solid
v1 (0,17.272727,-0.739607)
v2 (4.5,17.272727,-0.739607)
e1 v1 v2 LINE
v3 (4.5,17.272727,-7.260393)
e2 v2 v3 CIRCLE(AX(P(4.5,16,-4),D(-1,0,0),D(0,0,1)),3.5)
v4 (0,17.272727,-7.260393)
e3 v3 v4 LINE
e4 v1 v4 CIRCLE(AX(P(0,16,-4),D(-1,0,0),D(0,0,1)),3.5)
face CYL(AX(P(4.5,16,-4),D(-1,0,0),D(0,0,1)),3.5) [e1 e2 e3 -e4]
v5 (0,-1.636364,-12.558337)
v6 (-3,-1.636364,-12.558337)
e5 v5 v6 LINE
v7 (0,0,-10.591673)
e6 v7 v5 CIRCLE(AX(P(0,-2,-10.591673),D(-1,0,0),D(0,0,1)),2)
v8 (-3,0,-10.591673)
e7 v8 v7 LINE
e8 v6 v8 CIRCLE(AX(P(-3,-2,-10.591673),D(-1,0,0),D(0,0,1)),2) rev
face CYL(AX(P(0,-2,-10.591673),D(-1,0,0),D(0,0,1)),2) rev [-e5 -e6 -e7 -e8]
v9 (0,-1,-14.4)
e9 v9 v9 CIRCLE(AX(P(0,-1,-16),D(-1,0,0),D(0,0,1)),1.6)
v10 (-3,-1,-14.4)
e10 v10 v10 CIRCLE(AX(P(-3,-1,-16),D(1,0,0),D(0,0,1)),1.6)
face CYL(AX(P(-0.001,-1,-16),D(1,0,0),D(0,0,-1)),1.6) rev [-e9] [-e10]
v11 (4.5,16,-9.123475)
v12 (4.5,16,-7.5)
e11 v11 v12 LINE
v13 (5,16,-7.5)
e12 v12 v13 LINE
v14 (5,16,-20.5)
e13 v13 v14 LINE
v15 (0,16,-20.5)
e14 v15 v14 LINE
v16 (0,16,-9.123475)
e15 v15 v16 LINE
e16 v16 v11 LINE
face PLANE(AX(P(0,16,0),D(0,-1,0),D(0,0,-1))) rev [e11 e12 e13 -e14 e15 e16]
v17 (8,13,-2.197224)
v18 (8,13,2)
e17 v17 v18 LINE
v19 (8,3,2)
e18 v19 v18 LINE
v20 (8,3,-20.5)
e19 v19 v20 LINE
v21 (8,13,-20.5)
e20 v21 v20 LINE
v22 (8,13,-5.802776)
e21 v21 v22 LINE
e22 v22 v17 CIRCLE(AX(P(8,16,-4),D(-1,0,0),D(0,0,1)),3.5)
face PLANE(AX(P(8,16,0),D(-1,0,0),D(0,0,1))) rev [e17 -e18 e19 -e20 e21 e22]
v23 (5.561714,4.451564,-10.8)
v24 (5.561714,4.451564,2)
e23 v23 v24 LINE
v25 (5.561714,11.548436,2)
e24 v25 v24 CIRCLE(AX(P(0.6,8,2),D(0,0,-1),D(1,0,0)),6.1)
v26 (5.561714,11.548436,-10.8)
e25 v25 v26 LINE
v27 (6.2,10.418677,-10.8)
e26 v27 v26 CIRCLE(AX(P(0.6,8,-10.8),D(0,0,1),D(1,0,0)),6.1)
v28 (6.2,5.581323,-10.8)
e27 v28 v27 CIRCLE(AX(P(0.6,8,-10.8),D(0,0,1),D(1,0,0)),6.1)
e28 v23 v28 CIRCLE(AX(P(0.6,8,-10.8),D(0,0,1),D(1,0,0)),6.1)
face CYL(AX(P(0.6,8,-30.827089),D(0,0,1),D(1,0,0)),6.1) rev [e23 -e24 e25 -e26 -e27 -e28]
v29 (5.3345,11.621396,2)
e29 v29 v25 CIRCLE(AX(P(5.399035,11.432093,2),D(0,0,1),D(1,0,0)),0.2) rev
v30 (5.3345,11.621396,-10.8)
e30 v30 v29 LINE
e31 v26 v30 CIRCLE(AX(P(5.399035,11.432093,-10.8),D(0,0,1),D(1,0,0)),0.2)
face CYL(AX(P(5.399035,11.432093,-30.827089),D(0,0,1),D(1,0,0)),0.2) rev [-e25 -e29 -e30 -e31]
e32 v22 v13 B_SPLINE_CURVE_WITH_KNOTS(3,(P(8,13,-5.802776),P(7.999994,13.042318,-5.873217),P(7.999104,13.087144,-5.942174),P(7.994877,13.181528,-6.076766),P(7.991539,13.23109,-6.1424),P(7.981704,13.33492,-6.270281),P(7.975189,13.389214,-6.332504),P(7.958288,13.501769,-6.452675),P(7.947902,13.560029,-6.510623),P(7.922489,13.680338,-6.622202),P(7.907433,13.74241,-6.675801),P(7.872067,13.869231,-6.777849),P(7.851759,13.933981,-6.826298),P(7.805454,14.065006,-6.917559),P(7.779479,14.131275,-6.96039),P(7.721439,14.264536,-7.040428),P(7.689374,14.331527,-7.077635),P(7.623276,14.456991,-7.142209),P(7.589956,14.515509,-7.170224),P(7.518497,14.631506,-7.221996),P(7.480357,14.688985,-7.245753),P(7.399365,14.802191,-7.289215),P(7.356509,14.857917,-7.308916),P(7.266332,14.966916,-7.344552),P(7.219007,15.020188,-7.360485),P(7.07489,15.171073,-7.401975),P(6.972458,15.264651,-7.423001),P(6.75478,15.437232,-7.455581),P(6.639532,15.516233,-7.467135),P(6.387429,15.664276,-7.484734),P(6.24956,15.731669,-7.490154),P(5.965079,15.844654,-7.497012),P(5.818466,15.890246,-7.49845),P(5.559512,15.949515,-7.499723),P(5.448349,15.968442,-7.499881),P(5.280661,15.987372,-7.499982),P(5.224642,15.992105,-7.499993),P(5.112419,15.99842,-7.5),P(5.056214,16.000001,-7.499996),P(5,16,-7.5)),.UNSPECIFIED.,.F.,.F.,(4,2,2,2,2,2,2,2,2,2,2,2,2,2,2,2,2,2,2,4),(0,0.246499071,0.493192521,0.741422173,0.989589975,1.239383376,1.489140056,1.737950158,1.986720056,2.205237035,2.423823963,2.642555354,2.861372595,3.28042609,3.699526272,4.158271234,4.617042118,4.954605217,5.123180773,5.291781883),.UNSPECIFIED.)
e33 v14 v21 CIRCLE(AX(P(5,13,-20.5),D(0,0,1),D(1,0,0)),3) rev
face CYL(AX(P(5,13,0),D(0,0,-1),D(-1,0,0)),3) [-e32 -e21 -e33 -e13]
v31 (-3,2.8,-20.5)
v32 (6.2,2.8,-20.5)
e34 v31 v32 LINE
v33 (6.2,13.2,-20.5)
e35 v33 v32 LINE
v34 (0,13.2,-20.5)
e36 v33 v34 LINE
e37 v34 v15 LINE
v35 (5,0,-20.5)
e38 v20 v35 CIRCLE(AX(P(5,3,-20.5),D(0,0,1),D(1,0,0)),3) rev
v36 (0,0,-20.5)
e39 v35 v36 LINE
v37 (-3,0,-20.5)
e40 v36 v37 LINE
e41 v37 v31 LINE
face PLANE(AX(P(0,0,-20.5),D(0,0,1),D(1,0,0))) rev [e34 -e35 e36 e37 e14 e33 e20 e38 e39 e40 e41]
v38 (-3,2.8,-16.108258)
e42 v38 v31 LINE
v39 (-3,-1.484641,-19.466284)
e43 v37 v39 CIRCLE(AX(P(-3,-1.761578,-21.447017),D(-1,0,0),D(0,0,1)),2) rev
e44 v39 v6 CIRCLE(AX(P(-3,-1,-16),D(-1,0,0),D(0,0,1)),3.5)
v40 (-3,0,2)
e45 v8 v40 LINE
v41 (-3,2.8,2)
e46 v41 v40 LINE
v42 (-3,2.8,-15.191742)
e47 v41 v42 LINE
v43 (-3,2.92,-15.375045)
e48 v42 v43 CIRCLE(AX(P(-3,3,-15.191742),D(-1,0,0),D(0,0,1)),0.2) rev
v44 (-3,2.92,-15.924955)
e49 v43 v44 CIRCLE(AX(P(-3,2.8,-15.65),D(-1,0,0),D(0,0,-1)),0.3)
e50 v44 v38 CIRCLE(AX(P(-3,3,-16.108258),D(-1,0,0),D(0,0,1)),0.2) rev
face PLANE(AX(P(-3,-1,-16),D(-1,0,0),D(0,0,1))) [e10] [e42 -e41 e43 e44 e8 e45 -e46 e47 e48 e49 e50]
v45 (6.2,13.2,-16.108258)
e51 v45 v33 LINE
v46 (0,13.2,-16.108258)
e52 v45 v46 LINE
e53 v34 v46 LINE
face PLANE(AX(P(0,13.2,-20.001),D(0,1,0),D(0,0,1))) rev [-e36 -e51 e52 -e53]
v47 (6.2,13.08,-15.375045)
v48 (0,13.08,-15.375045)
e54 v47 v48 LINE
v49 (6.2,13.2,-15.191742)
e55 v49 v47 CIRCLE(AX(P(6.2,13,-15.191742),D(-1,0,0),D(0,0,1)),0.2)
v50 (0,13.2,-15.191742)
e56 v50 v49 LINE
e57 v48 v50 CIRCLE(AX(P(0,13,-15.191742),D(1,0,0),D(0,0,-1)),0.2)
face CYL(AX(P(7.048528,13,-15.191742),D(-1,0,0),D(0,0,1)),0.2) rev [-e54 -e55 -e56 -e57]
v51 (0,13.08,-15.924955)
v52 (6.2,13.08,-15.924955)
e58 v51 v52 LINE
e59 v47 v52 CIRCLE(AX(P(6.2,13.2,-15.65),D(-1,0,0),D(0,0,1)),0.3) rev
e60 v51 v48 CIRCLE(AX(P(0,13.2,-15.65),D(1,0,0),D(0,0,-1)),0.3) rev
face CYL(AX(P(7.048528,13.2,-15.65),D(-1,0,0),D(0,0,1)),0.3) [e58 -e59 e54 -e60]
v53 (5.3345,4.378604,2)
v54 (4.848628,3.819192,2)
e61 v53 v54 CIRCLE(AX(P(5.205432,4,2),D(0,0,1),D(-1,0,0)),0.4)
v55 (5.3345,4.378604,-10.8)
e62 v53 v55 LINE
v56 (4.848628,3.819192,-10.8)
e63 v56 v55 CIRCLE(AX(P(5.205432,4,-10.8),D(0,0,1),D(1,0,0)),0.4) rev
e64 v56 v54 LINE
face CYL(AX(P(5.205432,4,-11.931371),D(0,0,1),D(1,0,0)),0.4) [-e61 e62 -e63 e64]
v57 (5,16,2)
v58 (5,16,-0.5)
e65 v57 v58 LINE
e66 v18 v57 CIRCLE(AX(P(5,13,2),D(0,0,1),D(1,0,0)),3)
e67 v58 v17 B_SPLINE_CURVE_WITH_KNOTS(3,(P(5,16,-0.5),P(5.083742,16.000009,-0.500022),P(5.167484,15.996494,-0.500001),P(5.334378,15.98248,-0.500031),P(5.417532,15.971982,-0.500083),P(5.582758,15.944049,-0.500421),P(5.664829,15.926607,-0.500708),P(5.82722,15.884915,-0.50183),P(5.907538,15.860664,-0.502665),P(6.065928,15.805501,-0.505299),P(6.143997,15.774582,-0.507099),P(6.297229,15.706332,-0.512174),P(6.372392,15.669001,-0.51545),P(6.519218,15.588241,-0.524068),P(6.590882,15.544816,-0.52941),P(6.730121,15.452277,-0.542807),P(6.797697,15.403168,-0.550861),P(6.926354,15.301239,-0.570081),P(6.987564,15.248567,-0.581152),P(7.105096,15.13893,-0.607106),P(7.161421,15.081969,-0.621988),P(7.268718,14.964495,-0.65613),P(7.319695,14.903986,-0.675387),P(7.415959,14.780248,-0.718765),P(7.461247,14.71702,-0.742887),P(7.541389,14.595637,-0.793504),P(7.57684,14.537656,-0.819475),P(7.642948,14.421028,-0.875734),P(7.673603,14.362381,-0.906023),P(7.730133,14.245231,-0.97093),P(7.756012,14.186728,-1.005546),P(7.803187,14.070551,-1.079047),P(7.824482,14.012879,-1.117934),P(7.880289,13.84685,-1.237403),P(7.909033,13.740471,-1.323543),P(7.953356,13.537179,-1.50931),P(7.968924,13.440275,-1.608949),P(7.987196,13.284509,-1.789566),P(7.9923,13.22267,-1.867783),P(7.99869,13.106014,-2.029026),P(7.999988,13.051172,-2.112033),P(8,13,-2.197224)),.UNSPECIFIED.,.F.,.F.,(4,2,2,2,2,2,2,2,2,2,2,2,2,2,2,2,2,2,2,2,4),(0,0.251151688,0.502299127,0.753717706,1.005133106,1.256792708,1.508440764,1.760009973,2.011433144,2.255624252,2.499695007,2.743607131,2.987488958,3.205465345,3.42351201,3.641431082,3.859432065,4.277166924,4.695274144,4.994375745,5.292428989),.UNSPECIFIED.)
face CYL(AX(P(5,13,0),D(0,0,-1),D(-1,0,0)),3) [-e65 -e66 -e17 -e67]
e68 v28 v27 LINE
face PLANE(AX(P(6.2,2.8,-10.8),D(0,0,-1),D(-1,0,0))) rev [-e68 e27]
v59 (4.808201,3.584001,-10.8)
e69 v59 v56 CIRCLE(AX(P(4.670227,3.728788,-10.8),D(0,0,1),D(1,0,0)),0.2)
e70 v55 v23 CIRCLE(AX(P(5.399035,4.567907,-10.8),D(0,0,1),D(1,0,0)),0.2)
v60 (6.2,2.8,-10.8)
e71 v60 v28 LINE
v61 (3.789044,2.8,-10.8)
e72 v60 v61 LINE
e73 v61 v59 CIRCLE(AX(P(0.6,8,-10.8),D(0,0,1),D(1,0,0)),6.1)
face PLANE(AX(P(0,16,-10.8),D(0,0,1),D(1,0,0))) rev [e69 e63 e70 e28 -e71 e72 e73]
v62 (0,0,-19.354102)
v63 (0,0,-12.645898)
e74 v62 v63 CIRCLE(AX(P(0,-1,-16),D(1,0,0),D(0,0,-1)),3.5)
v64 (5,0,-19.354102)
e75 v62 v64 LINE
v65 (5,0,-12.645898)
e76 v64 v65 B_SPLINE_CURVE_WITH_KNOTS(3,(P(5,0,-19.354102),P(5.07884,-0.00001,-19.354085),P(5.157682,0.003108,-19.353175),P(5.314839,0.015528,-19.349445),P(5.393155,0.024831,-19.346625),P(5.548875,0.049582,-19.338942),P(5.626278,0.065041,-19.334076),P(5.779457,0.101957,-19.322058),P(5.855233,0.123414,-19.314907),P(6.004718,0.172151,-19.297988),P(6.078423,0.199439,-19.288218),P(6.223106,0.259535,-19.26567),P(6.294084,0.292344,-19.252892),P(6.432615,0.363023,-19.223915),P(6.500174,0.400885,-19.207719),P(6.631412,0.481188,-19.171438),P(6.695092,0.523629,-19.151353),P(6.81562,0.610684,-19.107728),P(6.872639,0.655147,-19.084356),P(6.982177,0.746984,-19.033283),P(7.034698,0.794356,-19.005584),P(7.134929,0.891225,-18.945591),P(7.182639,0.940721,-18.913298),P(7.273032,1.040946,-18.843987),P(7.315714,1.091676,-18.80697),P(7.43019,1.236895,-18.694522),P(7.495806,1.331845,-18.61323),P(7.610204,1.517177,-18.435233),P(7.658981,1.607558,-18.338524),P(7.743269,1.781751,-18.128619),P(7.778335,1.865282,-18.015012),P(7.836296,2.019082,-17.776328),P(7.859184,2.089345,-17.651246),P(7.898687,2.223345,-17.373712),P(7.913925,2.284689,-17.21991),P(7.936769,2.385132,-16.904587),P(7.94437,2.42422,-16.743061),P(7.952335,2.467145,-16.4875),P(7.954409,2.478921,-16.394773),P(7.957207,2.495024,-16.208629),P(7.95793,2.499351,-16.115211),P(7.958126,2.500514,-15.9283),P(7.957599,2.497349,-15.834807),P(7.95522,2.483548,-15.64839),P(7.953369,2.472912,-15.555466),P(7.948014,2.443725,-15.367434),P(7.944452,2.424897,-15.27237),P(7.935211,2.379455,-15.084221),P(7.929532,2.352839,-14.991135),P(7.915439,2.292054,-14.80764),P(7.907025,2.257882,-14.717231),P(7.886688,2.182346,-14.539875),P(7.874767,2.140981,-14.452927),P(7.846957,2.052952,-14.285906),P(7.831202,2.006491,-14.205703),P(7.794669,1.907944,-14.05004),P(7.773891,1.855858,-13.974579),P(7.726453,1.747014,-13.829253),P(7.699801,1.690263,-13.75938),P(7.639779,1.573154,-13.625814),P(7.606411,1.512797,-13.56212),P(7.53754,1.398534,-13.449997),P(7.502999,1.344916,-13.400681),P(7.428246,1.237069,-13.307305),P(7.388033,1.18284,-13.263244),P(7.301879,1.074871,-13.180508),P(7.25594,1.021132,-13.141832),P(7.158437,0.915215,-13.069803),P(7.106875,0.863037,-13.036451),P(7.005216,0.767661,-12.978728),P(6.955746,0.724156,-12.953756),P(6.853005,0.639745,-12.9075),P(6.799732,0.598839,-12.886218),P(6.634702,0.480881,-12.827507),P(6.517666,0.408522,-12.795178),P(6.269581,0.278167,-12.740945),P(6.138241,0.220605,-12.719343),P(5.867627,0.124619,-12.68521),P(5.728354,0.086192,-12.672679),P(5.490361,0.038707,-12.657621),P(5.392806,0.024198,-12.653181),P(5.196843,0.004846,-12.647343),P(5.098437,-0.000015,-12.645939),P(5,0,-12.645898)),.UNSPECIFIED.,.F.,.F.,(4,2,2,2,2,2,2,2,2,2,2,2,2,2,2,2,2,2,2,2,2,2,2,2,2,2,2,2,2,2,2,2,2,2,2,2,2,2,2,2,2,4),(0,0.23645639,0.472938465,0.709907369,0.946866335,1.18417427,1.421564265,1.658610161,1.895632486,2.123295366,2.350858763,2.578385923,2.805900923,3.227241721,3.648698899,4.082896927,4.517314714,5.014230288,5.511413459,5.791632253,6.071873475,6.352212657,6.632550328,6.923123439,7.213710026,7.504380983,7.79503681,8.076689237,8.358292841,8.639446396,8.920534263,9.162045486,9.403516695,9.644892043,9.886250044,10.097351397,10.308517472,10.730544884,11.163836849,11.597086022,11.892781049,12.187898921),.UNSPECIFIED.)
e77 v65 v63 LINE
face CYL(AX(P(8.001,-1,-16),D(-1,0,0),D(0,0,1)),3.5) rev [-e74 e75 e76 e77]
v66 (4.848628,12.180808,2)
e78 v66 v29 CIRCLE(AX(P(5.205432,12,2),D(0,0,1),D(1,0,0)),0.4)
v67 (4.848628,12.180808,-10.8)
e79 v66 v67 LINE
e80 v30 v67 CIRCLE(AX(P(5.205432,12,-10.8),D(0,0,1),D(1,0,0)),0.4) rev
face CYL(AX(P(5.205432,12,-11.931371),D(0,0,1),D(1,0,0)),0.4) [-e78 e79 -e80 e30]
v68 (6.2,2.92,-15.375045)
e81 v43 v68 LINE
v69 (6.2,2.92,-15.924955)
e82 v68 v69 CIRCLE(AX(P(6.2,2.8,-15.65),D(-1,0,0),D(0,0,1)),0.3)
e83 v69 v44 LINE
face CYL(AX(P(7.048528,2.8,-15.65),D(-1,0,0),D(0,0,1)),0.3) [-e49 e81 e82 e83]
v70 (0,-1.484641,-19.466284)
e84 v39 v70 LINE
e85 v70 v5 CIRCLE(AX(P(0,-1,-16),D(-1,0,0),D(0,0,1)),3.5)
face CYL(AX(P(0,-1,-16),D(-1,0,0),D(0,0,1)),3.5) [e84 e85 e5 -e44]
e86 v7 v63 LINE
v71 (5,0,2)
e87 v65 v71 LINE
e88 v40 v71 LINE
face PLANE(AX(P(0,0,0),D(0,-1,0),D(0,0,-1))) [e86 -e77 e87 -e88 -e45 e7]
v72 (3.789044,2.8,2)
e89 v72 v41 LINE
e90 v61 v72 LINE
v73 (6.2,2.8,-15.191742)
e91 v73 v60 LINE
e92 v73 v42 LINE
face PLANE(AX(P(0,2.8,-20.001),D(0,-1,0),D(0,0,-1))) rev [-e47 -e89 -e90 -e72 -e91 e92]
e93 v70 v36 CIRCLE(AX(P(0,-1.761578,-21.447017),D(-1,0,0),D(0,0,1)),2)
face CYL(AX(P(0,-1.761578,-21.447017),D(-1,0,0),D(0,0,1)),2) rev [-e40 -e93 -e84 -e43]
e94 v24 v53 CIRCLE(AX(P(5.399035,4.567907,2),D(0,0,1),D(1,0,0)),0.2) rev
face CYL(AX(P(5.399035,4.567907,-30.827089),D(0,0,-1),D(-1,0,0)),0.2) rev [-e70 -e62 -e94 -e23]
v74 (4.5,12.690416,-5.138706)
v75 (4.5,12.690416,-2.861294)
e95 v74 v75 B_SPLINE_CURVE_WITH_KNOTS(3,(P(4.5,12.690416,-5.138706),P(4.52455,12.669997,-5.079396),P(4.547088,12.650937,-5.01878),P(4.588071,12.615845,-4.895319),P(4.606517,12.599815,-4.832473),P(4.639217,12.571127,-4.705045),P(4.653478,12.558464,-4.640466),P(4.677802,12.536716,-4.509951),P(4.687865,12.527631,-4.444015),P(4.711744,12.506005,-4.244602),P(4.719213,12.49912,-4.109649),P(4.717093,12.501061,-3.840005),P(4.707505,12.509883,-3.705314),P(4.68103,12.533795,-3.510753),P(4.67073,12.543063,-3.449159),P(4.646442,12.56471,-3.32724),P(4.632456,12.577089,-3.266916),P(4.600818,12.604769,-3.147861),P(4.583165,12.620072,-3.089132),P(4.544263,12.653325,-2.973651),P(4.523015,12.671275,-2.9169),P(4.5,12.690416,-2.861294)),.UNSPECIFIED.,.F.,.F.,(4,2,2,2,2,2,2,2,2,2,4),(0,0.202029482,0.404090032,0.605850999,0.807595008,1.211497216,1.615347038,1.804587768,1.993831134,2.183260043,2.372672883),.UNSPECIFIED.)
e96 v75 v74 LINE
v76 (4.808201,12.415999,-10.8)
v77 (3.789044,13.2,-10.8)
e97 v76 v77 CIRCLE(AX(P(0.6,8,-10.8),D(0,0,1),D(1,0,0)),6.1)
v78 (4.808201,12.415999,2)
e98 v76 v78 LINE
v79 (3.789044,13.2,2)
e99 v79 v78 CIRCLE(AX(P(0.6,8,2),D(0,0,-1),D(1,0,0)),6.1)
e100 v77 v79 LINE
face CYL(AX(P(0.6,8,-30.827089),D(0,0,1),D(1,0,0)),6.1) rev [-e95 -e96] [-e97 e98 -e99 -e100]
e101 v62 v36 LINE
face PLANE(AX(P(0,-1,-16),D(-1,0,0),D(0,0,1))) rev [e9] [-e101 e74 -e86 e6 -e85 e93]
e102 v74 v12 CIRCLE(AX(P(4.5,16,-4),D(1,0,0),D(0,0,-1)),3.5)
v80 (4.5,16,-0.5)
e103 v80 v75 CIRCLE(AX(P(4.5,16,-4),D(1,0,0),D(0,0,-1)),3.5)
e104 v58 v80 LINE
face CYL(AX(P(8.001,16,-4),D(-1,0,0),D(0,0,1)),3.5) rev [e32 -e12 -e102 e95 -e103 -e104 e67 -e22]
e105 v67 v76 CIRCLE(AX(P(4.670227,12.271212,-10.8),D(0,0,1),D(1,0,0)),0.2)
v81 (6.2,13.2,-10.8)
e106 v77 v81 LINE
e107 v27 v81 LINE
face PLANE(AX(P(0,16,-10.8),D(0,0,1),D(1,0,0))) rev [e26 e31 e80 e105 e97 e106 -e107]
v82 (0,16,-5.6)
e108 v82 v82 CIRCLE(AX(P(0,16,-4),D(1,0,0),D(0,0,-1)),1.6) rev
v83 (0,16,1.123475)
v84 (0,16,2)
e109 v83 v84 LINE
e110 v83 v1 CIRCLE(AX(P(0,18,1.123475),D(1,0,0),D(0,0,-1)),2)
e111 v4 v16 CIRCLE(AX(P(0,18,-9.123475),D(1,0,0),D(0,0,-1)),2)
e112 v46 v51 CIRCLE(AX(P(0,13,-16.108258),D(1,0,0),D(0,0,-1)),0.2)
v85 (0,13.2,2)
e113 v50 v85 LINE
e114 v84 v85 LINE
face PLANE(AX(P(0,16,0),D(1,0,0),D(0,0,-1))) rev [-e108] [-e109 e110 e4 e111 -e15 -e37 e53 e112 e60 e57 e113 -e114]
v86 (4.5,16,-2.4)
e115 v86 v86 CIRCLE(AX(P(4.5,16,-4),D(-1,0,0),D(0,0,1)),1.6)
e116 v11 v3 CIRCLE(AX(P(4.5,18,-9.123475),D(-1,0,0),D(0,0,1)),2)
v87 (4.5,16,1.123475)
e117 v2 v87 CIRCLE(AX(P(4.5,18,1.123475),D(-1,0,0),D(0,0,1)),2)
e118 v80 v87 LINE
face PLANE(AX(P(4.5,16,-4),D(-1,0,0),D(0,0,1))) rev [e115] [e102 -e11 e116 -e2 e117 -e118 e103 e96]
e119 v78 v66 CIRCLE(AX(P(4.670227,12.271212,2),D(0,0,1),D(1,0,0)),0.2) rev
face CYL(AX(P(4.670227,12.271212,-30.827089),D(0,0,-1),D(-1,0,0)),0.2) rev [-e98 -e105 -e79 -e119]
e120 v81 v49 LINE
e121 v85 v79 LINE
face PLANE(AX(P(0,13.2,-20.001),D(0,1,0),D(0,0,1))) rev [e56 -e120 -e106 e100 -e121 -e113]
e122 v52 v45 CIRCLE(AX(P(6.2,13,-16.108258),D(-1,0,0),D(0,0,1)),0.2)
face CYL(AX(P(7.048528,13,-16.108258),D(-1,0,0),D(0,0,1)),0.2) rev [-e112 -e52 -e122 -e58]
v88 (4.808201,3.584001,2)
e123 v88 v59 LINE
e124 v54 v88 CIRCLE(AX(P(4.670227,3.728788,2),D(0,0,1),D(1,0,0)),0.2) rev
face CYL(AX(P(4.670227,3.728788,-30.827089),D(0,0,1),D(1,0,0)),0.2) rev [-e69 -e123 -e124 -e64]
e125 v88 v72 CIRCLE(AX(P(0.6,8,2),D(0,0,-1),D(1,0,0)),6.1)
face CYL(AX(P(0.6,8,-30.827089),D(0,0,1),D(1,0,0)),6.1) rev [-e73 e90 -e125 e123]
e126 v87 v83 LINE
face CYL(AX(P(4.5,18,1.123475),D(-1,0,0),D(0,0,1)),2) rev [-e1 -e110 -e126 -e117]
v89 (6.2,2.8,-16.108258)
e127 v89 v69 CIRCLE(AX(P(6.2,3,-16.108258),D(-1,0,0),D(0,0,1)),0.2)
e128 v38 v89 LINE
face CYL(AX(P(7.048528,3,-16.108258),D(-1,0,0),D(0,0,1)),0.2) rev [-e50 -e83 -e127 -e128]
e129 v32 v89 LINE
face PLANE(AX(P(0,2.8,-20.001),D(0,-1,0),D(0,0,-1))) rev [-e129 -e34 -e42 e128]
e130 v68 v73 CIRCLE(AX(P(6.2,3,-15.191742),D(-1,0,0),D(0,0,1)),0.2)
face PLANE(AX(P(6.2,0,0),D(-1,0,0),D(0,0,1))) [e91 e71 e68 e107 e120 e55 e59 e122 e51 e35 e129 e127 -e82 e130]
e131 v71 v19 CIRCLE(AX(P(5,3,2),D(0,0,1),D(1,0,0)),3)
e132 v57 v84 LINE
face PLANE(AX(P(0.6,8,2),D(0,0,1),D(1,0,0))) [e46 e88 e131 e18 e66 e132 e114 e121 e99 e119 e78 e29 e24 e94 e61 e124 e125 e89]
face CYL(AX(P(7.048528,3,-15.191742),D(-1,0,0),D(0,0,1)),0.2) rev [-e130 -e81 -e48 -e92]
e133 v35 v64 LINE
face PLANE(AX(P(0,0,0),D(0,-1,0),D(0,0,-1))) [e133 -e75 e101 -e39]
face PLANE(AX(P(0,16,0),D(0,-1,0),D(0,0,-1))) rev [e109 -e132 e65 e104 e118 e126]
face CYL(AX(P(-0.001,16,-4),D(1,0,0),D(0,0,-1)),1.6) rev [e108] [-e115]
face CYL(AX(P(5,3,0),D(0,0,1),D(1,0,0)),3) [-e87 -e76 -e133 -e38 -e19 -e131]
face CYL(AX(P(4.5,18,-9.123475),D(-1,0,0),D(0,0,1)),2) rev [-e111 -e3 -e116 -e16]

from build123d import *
from build123d.topology import SkipClean

# Parameters (mm, degrees)
SKETCH_1_W          = 8
SKETCH_1_H          = 20
EXTRUDE_1_DEPTH     = 16
CUT_EXTRUDE_1_REACH = 28.833
SKETCH_2_W          = 6.8
SKETCH_2_H          = 10.4
EXTRUDE_3_DEPTH     = 10.8
CUT_EXTRUDE_2_REACH = 28.833
SKETCH_4_R          = 1.6
EXTRUDE_5_DEPTH     = 3
EXTRUDE_START       = -4.5
SKETCH_5_R          = 1.6
EXTRUDE_4_DEPTH     = 4.5
EXTRUDE_START_2     = -3
SKETCH_7_R          = 3.5
SKETCH_7_R_2        = 1.6
EXTRUDE_6_DEPTH     = 3
CUT_EXTRUDE_3_REACH = 31.056
SKETCH_8_R          = 3.5
EXTRUDE_7_DEPTH     = 0.5
CUT_EXTRUDE_4_REACH = 31.27
SKETCH_10_R         = 3.5
EXTRUDE_START_3     = 2
EXTRUDE_8_DEPTH     = 2
FILLET_1_R          = 2
FILLET_2_R          = 3
SKETCH_12_W         = 9.7
SKETCH_12_H         = 10.4
EXTRUDE_9_DEPTH     = 0.6
SKETCH_13_R         = 0.4
EXTRUDE_10_DEPTH    = 12.8
FILLET_3_R          = 0.2
EXTRUDE_11_REACH    = 32.356
SKETCH_14_R         = 0.3
SKETCH_15_R         = 0.3
CUT_EXTRUDE_5_DEPTH = 3
FILLET_4_R          = 0.2


with BuildPart() as part:
    # 草图1 → 凸台-拉伸1 (new body)
    with BuildSketch(Plane(origin=(0, 0, 0), x_dir=(1, 0, 0), z_dir=(0, 1, 0))):
        with Locations((4, 10)):
            Rectangle(SKETCH_1_W, SKETCH_1_H)
    extrude(amount=EXTRUDE_1_DEPTH)

    # 草图2 → 切除-拉伸1 (cut, up to next)
    with BuildSketch(Plane.XY, mode=Mode.PRIVATE) as cut_extrude_1_sk1:
        with Locations((3.4, 8)):
            Rectangle(SKETCH_2_W, SKETCH_2_H)
    cut_extrude_1_tool1 = extrude(cut_extrude_1_sk1.sketch, amount=-CUT_EXTRUDE_1_REACH, mode=Mode.PRIVATE) & part.part
    add(cut_extrude_1_tool1.solids().sort_by_distance((3.4, 8, 0))[0], mode=Mode.SUBTRACT)

    # 草图3 → 凸台-拉伸3 (add)
    with BuildSketch(Plane.XY):
        with BuildLine():
            Line((3.789043744, 13.2), (6.8, 13.2))
            Line((6.8, 13.2), (6.8, 2.8))
            Line((6.8, 2.8), (3.789043744, 2.8))
            ThreePointArc((3.789043744, 2.8), (6.7, 8), (3.789043744, 13.2))
        make_face()
    extrude(amount=-EXTRUDE_3_DEPTH)

    # 草图4 → 切除-拉伸2 (cut, up to next)
    with BuildSketch(Plane(origin=(8, 0, 0), x_dir=(0, 0, -1), z_dir=(1, 0, 0)), mode=Mode.PRIVATE) as cut_extrude_2_sk1:
        with Locations((4, 16)):
            Circle(SKETCH_4_R)
    cut_extrude_2_tool1 = extrude(cut_extrude_2_sk1.sketch, amount=-CUT_EXTRUDE_2_REACH, mode=Mode.PRIVATE) & part.part
    # 草图4 → 切除-拉伸2 (cut, up to next)
    with BuildSketch(Plane(origin=(8, 0, 0), x_dir=(0, 0, -1), z_dir=(1, 0, 0)), mode=Mode.PRIVATE) as cut_extrude_2_sk2:
        with Locations((16, -1)):
            Circle(SKETCH_4_R)
    cut_extrude_2_tool2 = extrude(cut_extrude_2_sk2.sketch, amount=-CUT_EXTRUDE_2_REACH, mode=Mode.PRIVATE) & part.part
    add(cut_extrude_2_tool1.solids().sort_by_distance((8, 16, -4))[0], mode=Mode.SUBTRACT)
    add(cut_extrude_2_tool2.solids().sort_by_distance((8, -1, -16))[0], mode=Mode.SUBTRACT)

    # 草图6 → 凸台-拉伸5 (add)
    with BuildSketch(Plane.ZY):
        with BuildLine():
            Line((-20, 0), (-17.2489996, 0))
            ThreePointArc((-17.2489996, 0), (-16, 0.6), (-14.7510004, 0))
            Line((-14.7510004, 0), (0, 0))
            Line((0, 0), (0, 2.8))
            Line((0, 2.8), (-20, 2.8))
            Line((-20, 2.8), (-20, 0))
        make_face()
    extrude(amount=EXTRUDE_5_DEPTH)

    # 草图5 → 凸台-拉伸4 (add)
    with BuildSketch(Plane.ZY.offset(EXTRUDE_START)):
        with BuildLine():
            Line((-6.1, 13.2), (-1.9, 13.2))
            ThreePointArc((-1.9, 13.2), (-4, 19.5), (-6.1, 13.2))
        make_face()
        with Locations(Location((-4, 16, 0), (0, 0, 180))):
            Circle(SKETCH_5_R, mode=Mode.SUBTRACT)
    extrude(amount=EXTRUDE_4_DEPTH)

    # 草图7 → 凸台-拉伸6 (add)
    with BuildSketch(Plane.ZY.offset(3).offset(EXTRUDE_START_2)):
        with Locations((-16, -1)):
            Circle(SKETCH_7_R)
        with Locations(Location((-16, -1, 0), (0, 0, 141.317812547))):
            Circle(SKETCH_7_R_2, mode=Mode.SUBTRACT)
    extrude(amount=EXTRUDE_6_DEPTH)

    # 草图8 → 切除-拉伸3 (cut, up to next)
    with BuildSketch(Plane(origin=(0, 0, 0), x_dir=(0, 0, -1), z_dir=(1, 0, 0)), mode=Mode.PRIVATE) as cut_extrude_3_sk1:
        with Locations((16, -1)):
            Circle(SKETCH_8_R)
    cut_extrude_3_tool1 = extrude(cut_extrude_3_sk1.sketch, amount=CUT_EXTRUDE_3_REACH, mode=Mode.PRIVATE) & part.part
    add(cut_extrude_3_tool1.solids().sort_by_distance((0, -1, -16))[0], mode=Mode.SUBTRACT)

    # 草图9 → 凸台-拉伸7 (add)
    with SkipClean():  # the faces are left unmerged after this step: merging them gives an invalid solid
        with BuildSketch(Plane(origin=(0, 0, -20), x_dir=(-1, 0, 0), z_dir=(0, 0, -1))):
            Polygon((-6.8, 2.8), (-6.8, 13.2), (0, 13.2), (0, 16), (-8, 16), (-8, 0), (3, 0), (3, 2.8), align=None)
        extrude(amount=EXTRUDE_7_DEPTH)

    # 草图10 → 切除-拉伸4 (cut, up to next)
    with BuildSketch(Plane(origin=(4.5, 0, 0), x_dir=(0, 0, -1), z_dir=(1, 0, 0)), mode=Mode.PRIVATE) as cut_extrude_4_sk1:
        with Locations((4, 16)):
            Circle(SKETCH_10_R)
    cut_extrude_4_tool1 = extrude(cut_extrude_4_sk1.sketch, amount=CUT_EXTRUDE_4_REACH, mode=Mode.PRIVATE) & part.part
    add(cut_extrude_4_tool1.solids().sort_by_distance((4.5, 16, -4))[0], mode=Mode.SUBTRACT)

    # 草图11 → 凸台-拉伸8 (add)
    with SkipClean():  # the faces are left unmerged after this step: merging them gives an invalid solid
        with BuildSketch(Plane.XY.offset(EXTRUDE_START_3)):
            with BuildLine():
                Line((0, 13.2), (3.789043744, 13.2))
                ThreePointArc((3.789043744, 13.2), (6.7, 8), (3.789043744, 2.8))
                Line((3.789043744, 2.8), (-3, 2.8))
                Line((-3, 2.8), (-3, 0))
                Line((-3, 0), (8, 0))
                Line((8, 0), (8, 16))
                Line((8, 16), (0, 16))
                Line((0, 16), (0, 13.2))
            make_face()
        extrude(amount=-EXTRUDE_8_DEPTH)

    # 圆角1
    # the kernel refuses this fillet: 2 mm, written as the material it adds along each edge
    with BuildSketch(Plane(origin=(-3, 0, -19.354101966), x_dir=(0, 0, -1), z_dir=(1, 0, 0))) as fillet_1_piece_1:
        with BuildLine():
            CenterArc((2.09291543, -1.761578284), FILLET_1_R, 118.262295856, 53.77845338)
            ThreePointArc((0.112181831, -1.484640726), (0.135948895, -0.736286166), (0, 0))
            Line((0, 0), (1.145898034, 0))
        make_face()
    extrude(amount=3)
    with BuildSketch(Plane(origin=(-3, 0, -12.645898034), x_dir=(0, 0, 1), z_dir=(1, 0, 0))) as fillet_1_piece_2:
        with BuildLine():
            CenterArc((2.054224947, 2), FILLET_1_R, 190.475681696, 79.524318304)
            ThreePointArc((0.087560615, 1.636363636), (0.140898096, 0.812985117), (0, 0))
            Line((0, 0), (2.054224947, 0))
        make_face()
    extrude(amount=3)
    with BuildSketch(Plane(origin=(0, 16, -7.5), x_dir=(0, 0, -1), z_dir=(1, 0, 0))) as fillet_1_piece_3:
        with BuildLine():
            CenterArc((1.623475383, 2), FILLET_1_R, 201.323686263, 68.676313737)
            ThreePointArc((-0.239606574, 1.272727273), (-0.06042321, 0.647542667), (0, 0))
            Line((0, 0), (1.623475383, 0))
        make_face()
    extrude(amount=4.5)
    with BuildSketch(Plane(origin=(0, 16, -0.5), x_dir=(0, 0, 1), z_dir=(1, 0, 0))) as fillet_1_piece_4:
        with BuildLine():
            CenterArc((1.623475383, -2), FILLET_1_R, 90, 68.676313737)
            ThreePointArc((-0.239606574, -1.272727273), (-0.06042321, -0.647542667), (0, 0))
            Line((0, 0), (1.623475383, 0))
        make_face()
    extrude(amount=4.5)

    # 圆角2
    # the kernel refuses this fillet: 3 mm, written as the material it takes off along each edge
    with BuildSketch(Plane(origin=(8, 16, -8), x_dir=(-1, 0, 0), z_dir=(0, 0, 1))) as fillet_2_piece_1:
        with BuildLine():
            CenterArc((FILLET_2_R, FILLET_2_R), FILLET_2_R, 180, 90)
            Line((0, FILLET_2_R), (0, 0))
            Line((0, 0), (FILLET_2_R, 0))
        make_face()
    extrude(amount=17.5, mode=Mode.SUBTRACT)
    with BuildSketch(Plane(origin=(8, 0, -11.854101966), x_dir=(0, 1, 0), z_dir=(0, 0, -1))) as fillet_2_piece_2:
        with BuildLine():
            CenterArc((FILLET_2_R, -FILLET_2_R), FILLET_2_R, 90, 90)
            Line((0, -FILLET_2_R), (0, 0))
            Line((0, 0), (FILLET_2_R, 0))
        make_face()
    extrude(amount=16.145898034, mode=Mode.SUBTRACT)
    with BuildSketch(Plane(origin=(8, 16, -28), x_dir=(0, -1, 0), z_dir=(0, 0, 1))) as fillet_2_piece_3:
        with BuildLine():
            CenterArc((FILLET_2_R, -FILLET_2_R), FILLET_2_R, 90, 90)
            Line((0, -FILLET_2_R), (0, 0))
            Line((0, 0), (FILLET_2_R, 0))
        make_face()
    extrude(amount=28, mode=Mode.SUBTRACT)
    with BuildSketch(Plane(origin=(8, 0, -20.145898034), x_dir=(0, 1, 0), z_dir=(0, 0, 1))) as fillet_2_piece_4:
        with BuildLine():
            CenterArc((FILLET_2_R, FILLET_2_R), FILLET_2_R, 180, 90)
            Line((0, FILLET_2_R), (0, 0))
            Line((0, 0), (FILLET_2_R, 0))
        make_face()
    extrude(amount=29.645898034, mode=Mode.SUBTRACT)

    # 草图12 → 凸台-拉伸9 (add)
    with BuildSketch(Plane.ZY.offset(-6.8)):
        with Locations((-15.65, 8)):
            Rectangle(SKETCH_12_W, SKETCH_12_H)
    extrude(amount=EXTRUDE_9_DEPTH)

    # 草图13 → 凸台-拉伸10 (add)
    with BuildSketch(Plane.XY.offset(2)):
        with Locations((5.205431576, 12)):
            Circle(SKETCH_13_R)
        with Locations((5.205431576, 4)):
            Circle(SKETCH_13_R)
    extrude(amount=-EXTRUDE_10_DEPTH)

    # 圆角3
    fillet_3_edges = [part.edges().sort_by_distance(p)[0] for p in [
        (4.933376021, 12.293233311, -5.4),
        (5.457684147, 11.689567011, -5.4),
        (5.457684147, 4.310432989, -5.4),
        (4.933376021, 3.706766689, -5.4),
    ]]
    fillet(fillet_3_edges, radius=FILLET_3_R)

    # 凸台-拉伸11: up to this face of the body (flat: up to its plane)
    extrude_11_end = Plane(part.part.faces().sort_by_distance((6.2, 8, -15.65))[0])
    # 草图14 → 凸台-拉伸11 (add, up to the picked face)
    with BuildSketch(Plane.ZY.offset(3), mode=Mode.PRIVATE) as extrude_11_sk1:
        with Locations((-15.65, 13.2)):
            Circle(SKETCH_14_R)
    extrude_11_tool1 = split(extrude(extrude_11_sk1.sketch, amount=-EXTRUDE_11_REACH, mode=Mode.PRIVATE), bisect_by=extrude_11_end, keep=Keep.BOTH, mode=Mode.PRIVATE)
    # 草图14 → 凸台-拉伸11 (add, up to the picked face)
    with BuildSketch(Plane.ZY.offset(3), mode=Mode.PRIVATE) as extrude_11_sk2:
        with Locations((-15.65, 2.8)):
            Circle(SKETCH_14_R)
    extrude_11_tool2 = split(extrude(extrude_11_sk2.sketch, amount=-EXTRUDE_11_REACH, mode=Mode.PRIVATE), bisect_by=extrude_11_end, keep=Keep.BOTH, mode=Mode.PRIVATE)
    add(extrude_11_tool1.solids().sort_by(Axis((-3, 13.2, -15.65), (1, 0, 0)))[0])
    add(extrude_11_tool2.solids().sort_by(Axis((-3, 2.8, -15.65), (1, 0, 0)))[0])

    # 草图15 → 切除-拉伸5 (cut)
    with BuildSketch(Plane.ZY.offset(3)):
        with Locations((-15.65, 13.2)):
            Circle(SKETCH_15_R)
    extrude(amount=-CUT_EXTRUDE_5_DEPTH, mode=Mode.SUBTRACT)

    # 圆角4
    # the kernel refuses this fillet: 0.2 mm, written as the material it adds along each edge
    with BuildSketch(Plane(origin=(6.595643924, 13.2, -15.95), x_dir=(0, -0.978906312930706, 0.20430964368920726), z_dir=(-1, 0, 0))) as fillet_4_piece_1:
        with BuildLine():
            CenterArc((0.163447715, -0.195781263), FILLET_4_R, 101.789089239, 66.421821522)
            Line((-0.032333548, -0.154919334), (0, 0))
            ThreePointArc((0, 0), (0.061292893, -0.006328106), (0.122585786, 0))
        make_face()
    extrude(amount=6.595643924)
    with BuildSketch(Plane(origin=(0, 13.2, -15.35), x_dir=(0, 0, 1), z_dir=(1, 0, 0))) as fillet_4_piece_2:
        with BuildLine():
            CenterArc((0.158257569, 0.2), FILLET_4_R, 203.578178478, 66.421821522)
            ThreePointArc((-0.025045458, 0.12), (-0.006328106, 0.061292893), (0, 0))
            Line((0, 0), (0.158257569, 0))
        make_face()
    extrude(amount=6.595643924)
    with BuildSketch(Plane(origin=(-3, 2.8, -15.35), x_dir=(0, 0, 1), z_dir=(1, 0, 0))) as fillet_4_piece_3:
        with BuildLine():
            CenterArc((0.158257569, -0.2), FILLET_4_R, 90, 66.421821522)
            ThreePointArc((-0.025045458, -0.12), (-0.006328106, -0.061292893), (0, 0))
            Line((0, 0), (0.158257569, 0))
        make_face()
    extrude(amount=9.595643924)
    with BuildSketch(Plane(origin=(6.595643924, 2.8, -15.95), x_dir=(0, 0.9789063129307064, 0.20430964368920507), z_dir=(-1, 0, 0))) as fillet_4_piece_4:
        with BuildLine():
            CenterArc((0.163447715, 0.195781263), FILLET_4_R, 191.789089239, 66.421821522)
            Line((-0.032333548, 0.154919334), (0, 0))
            ThreePointArc((0, 0), (0.061292893, 0.006328106), (0.122585786, 0))
        make_face()
    extrude(amount=9.595643924)


solid = part.part
